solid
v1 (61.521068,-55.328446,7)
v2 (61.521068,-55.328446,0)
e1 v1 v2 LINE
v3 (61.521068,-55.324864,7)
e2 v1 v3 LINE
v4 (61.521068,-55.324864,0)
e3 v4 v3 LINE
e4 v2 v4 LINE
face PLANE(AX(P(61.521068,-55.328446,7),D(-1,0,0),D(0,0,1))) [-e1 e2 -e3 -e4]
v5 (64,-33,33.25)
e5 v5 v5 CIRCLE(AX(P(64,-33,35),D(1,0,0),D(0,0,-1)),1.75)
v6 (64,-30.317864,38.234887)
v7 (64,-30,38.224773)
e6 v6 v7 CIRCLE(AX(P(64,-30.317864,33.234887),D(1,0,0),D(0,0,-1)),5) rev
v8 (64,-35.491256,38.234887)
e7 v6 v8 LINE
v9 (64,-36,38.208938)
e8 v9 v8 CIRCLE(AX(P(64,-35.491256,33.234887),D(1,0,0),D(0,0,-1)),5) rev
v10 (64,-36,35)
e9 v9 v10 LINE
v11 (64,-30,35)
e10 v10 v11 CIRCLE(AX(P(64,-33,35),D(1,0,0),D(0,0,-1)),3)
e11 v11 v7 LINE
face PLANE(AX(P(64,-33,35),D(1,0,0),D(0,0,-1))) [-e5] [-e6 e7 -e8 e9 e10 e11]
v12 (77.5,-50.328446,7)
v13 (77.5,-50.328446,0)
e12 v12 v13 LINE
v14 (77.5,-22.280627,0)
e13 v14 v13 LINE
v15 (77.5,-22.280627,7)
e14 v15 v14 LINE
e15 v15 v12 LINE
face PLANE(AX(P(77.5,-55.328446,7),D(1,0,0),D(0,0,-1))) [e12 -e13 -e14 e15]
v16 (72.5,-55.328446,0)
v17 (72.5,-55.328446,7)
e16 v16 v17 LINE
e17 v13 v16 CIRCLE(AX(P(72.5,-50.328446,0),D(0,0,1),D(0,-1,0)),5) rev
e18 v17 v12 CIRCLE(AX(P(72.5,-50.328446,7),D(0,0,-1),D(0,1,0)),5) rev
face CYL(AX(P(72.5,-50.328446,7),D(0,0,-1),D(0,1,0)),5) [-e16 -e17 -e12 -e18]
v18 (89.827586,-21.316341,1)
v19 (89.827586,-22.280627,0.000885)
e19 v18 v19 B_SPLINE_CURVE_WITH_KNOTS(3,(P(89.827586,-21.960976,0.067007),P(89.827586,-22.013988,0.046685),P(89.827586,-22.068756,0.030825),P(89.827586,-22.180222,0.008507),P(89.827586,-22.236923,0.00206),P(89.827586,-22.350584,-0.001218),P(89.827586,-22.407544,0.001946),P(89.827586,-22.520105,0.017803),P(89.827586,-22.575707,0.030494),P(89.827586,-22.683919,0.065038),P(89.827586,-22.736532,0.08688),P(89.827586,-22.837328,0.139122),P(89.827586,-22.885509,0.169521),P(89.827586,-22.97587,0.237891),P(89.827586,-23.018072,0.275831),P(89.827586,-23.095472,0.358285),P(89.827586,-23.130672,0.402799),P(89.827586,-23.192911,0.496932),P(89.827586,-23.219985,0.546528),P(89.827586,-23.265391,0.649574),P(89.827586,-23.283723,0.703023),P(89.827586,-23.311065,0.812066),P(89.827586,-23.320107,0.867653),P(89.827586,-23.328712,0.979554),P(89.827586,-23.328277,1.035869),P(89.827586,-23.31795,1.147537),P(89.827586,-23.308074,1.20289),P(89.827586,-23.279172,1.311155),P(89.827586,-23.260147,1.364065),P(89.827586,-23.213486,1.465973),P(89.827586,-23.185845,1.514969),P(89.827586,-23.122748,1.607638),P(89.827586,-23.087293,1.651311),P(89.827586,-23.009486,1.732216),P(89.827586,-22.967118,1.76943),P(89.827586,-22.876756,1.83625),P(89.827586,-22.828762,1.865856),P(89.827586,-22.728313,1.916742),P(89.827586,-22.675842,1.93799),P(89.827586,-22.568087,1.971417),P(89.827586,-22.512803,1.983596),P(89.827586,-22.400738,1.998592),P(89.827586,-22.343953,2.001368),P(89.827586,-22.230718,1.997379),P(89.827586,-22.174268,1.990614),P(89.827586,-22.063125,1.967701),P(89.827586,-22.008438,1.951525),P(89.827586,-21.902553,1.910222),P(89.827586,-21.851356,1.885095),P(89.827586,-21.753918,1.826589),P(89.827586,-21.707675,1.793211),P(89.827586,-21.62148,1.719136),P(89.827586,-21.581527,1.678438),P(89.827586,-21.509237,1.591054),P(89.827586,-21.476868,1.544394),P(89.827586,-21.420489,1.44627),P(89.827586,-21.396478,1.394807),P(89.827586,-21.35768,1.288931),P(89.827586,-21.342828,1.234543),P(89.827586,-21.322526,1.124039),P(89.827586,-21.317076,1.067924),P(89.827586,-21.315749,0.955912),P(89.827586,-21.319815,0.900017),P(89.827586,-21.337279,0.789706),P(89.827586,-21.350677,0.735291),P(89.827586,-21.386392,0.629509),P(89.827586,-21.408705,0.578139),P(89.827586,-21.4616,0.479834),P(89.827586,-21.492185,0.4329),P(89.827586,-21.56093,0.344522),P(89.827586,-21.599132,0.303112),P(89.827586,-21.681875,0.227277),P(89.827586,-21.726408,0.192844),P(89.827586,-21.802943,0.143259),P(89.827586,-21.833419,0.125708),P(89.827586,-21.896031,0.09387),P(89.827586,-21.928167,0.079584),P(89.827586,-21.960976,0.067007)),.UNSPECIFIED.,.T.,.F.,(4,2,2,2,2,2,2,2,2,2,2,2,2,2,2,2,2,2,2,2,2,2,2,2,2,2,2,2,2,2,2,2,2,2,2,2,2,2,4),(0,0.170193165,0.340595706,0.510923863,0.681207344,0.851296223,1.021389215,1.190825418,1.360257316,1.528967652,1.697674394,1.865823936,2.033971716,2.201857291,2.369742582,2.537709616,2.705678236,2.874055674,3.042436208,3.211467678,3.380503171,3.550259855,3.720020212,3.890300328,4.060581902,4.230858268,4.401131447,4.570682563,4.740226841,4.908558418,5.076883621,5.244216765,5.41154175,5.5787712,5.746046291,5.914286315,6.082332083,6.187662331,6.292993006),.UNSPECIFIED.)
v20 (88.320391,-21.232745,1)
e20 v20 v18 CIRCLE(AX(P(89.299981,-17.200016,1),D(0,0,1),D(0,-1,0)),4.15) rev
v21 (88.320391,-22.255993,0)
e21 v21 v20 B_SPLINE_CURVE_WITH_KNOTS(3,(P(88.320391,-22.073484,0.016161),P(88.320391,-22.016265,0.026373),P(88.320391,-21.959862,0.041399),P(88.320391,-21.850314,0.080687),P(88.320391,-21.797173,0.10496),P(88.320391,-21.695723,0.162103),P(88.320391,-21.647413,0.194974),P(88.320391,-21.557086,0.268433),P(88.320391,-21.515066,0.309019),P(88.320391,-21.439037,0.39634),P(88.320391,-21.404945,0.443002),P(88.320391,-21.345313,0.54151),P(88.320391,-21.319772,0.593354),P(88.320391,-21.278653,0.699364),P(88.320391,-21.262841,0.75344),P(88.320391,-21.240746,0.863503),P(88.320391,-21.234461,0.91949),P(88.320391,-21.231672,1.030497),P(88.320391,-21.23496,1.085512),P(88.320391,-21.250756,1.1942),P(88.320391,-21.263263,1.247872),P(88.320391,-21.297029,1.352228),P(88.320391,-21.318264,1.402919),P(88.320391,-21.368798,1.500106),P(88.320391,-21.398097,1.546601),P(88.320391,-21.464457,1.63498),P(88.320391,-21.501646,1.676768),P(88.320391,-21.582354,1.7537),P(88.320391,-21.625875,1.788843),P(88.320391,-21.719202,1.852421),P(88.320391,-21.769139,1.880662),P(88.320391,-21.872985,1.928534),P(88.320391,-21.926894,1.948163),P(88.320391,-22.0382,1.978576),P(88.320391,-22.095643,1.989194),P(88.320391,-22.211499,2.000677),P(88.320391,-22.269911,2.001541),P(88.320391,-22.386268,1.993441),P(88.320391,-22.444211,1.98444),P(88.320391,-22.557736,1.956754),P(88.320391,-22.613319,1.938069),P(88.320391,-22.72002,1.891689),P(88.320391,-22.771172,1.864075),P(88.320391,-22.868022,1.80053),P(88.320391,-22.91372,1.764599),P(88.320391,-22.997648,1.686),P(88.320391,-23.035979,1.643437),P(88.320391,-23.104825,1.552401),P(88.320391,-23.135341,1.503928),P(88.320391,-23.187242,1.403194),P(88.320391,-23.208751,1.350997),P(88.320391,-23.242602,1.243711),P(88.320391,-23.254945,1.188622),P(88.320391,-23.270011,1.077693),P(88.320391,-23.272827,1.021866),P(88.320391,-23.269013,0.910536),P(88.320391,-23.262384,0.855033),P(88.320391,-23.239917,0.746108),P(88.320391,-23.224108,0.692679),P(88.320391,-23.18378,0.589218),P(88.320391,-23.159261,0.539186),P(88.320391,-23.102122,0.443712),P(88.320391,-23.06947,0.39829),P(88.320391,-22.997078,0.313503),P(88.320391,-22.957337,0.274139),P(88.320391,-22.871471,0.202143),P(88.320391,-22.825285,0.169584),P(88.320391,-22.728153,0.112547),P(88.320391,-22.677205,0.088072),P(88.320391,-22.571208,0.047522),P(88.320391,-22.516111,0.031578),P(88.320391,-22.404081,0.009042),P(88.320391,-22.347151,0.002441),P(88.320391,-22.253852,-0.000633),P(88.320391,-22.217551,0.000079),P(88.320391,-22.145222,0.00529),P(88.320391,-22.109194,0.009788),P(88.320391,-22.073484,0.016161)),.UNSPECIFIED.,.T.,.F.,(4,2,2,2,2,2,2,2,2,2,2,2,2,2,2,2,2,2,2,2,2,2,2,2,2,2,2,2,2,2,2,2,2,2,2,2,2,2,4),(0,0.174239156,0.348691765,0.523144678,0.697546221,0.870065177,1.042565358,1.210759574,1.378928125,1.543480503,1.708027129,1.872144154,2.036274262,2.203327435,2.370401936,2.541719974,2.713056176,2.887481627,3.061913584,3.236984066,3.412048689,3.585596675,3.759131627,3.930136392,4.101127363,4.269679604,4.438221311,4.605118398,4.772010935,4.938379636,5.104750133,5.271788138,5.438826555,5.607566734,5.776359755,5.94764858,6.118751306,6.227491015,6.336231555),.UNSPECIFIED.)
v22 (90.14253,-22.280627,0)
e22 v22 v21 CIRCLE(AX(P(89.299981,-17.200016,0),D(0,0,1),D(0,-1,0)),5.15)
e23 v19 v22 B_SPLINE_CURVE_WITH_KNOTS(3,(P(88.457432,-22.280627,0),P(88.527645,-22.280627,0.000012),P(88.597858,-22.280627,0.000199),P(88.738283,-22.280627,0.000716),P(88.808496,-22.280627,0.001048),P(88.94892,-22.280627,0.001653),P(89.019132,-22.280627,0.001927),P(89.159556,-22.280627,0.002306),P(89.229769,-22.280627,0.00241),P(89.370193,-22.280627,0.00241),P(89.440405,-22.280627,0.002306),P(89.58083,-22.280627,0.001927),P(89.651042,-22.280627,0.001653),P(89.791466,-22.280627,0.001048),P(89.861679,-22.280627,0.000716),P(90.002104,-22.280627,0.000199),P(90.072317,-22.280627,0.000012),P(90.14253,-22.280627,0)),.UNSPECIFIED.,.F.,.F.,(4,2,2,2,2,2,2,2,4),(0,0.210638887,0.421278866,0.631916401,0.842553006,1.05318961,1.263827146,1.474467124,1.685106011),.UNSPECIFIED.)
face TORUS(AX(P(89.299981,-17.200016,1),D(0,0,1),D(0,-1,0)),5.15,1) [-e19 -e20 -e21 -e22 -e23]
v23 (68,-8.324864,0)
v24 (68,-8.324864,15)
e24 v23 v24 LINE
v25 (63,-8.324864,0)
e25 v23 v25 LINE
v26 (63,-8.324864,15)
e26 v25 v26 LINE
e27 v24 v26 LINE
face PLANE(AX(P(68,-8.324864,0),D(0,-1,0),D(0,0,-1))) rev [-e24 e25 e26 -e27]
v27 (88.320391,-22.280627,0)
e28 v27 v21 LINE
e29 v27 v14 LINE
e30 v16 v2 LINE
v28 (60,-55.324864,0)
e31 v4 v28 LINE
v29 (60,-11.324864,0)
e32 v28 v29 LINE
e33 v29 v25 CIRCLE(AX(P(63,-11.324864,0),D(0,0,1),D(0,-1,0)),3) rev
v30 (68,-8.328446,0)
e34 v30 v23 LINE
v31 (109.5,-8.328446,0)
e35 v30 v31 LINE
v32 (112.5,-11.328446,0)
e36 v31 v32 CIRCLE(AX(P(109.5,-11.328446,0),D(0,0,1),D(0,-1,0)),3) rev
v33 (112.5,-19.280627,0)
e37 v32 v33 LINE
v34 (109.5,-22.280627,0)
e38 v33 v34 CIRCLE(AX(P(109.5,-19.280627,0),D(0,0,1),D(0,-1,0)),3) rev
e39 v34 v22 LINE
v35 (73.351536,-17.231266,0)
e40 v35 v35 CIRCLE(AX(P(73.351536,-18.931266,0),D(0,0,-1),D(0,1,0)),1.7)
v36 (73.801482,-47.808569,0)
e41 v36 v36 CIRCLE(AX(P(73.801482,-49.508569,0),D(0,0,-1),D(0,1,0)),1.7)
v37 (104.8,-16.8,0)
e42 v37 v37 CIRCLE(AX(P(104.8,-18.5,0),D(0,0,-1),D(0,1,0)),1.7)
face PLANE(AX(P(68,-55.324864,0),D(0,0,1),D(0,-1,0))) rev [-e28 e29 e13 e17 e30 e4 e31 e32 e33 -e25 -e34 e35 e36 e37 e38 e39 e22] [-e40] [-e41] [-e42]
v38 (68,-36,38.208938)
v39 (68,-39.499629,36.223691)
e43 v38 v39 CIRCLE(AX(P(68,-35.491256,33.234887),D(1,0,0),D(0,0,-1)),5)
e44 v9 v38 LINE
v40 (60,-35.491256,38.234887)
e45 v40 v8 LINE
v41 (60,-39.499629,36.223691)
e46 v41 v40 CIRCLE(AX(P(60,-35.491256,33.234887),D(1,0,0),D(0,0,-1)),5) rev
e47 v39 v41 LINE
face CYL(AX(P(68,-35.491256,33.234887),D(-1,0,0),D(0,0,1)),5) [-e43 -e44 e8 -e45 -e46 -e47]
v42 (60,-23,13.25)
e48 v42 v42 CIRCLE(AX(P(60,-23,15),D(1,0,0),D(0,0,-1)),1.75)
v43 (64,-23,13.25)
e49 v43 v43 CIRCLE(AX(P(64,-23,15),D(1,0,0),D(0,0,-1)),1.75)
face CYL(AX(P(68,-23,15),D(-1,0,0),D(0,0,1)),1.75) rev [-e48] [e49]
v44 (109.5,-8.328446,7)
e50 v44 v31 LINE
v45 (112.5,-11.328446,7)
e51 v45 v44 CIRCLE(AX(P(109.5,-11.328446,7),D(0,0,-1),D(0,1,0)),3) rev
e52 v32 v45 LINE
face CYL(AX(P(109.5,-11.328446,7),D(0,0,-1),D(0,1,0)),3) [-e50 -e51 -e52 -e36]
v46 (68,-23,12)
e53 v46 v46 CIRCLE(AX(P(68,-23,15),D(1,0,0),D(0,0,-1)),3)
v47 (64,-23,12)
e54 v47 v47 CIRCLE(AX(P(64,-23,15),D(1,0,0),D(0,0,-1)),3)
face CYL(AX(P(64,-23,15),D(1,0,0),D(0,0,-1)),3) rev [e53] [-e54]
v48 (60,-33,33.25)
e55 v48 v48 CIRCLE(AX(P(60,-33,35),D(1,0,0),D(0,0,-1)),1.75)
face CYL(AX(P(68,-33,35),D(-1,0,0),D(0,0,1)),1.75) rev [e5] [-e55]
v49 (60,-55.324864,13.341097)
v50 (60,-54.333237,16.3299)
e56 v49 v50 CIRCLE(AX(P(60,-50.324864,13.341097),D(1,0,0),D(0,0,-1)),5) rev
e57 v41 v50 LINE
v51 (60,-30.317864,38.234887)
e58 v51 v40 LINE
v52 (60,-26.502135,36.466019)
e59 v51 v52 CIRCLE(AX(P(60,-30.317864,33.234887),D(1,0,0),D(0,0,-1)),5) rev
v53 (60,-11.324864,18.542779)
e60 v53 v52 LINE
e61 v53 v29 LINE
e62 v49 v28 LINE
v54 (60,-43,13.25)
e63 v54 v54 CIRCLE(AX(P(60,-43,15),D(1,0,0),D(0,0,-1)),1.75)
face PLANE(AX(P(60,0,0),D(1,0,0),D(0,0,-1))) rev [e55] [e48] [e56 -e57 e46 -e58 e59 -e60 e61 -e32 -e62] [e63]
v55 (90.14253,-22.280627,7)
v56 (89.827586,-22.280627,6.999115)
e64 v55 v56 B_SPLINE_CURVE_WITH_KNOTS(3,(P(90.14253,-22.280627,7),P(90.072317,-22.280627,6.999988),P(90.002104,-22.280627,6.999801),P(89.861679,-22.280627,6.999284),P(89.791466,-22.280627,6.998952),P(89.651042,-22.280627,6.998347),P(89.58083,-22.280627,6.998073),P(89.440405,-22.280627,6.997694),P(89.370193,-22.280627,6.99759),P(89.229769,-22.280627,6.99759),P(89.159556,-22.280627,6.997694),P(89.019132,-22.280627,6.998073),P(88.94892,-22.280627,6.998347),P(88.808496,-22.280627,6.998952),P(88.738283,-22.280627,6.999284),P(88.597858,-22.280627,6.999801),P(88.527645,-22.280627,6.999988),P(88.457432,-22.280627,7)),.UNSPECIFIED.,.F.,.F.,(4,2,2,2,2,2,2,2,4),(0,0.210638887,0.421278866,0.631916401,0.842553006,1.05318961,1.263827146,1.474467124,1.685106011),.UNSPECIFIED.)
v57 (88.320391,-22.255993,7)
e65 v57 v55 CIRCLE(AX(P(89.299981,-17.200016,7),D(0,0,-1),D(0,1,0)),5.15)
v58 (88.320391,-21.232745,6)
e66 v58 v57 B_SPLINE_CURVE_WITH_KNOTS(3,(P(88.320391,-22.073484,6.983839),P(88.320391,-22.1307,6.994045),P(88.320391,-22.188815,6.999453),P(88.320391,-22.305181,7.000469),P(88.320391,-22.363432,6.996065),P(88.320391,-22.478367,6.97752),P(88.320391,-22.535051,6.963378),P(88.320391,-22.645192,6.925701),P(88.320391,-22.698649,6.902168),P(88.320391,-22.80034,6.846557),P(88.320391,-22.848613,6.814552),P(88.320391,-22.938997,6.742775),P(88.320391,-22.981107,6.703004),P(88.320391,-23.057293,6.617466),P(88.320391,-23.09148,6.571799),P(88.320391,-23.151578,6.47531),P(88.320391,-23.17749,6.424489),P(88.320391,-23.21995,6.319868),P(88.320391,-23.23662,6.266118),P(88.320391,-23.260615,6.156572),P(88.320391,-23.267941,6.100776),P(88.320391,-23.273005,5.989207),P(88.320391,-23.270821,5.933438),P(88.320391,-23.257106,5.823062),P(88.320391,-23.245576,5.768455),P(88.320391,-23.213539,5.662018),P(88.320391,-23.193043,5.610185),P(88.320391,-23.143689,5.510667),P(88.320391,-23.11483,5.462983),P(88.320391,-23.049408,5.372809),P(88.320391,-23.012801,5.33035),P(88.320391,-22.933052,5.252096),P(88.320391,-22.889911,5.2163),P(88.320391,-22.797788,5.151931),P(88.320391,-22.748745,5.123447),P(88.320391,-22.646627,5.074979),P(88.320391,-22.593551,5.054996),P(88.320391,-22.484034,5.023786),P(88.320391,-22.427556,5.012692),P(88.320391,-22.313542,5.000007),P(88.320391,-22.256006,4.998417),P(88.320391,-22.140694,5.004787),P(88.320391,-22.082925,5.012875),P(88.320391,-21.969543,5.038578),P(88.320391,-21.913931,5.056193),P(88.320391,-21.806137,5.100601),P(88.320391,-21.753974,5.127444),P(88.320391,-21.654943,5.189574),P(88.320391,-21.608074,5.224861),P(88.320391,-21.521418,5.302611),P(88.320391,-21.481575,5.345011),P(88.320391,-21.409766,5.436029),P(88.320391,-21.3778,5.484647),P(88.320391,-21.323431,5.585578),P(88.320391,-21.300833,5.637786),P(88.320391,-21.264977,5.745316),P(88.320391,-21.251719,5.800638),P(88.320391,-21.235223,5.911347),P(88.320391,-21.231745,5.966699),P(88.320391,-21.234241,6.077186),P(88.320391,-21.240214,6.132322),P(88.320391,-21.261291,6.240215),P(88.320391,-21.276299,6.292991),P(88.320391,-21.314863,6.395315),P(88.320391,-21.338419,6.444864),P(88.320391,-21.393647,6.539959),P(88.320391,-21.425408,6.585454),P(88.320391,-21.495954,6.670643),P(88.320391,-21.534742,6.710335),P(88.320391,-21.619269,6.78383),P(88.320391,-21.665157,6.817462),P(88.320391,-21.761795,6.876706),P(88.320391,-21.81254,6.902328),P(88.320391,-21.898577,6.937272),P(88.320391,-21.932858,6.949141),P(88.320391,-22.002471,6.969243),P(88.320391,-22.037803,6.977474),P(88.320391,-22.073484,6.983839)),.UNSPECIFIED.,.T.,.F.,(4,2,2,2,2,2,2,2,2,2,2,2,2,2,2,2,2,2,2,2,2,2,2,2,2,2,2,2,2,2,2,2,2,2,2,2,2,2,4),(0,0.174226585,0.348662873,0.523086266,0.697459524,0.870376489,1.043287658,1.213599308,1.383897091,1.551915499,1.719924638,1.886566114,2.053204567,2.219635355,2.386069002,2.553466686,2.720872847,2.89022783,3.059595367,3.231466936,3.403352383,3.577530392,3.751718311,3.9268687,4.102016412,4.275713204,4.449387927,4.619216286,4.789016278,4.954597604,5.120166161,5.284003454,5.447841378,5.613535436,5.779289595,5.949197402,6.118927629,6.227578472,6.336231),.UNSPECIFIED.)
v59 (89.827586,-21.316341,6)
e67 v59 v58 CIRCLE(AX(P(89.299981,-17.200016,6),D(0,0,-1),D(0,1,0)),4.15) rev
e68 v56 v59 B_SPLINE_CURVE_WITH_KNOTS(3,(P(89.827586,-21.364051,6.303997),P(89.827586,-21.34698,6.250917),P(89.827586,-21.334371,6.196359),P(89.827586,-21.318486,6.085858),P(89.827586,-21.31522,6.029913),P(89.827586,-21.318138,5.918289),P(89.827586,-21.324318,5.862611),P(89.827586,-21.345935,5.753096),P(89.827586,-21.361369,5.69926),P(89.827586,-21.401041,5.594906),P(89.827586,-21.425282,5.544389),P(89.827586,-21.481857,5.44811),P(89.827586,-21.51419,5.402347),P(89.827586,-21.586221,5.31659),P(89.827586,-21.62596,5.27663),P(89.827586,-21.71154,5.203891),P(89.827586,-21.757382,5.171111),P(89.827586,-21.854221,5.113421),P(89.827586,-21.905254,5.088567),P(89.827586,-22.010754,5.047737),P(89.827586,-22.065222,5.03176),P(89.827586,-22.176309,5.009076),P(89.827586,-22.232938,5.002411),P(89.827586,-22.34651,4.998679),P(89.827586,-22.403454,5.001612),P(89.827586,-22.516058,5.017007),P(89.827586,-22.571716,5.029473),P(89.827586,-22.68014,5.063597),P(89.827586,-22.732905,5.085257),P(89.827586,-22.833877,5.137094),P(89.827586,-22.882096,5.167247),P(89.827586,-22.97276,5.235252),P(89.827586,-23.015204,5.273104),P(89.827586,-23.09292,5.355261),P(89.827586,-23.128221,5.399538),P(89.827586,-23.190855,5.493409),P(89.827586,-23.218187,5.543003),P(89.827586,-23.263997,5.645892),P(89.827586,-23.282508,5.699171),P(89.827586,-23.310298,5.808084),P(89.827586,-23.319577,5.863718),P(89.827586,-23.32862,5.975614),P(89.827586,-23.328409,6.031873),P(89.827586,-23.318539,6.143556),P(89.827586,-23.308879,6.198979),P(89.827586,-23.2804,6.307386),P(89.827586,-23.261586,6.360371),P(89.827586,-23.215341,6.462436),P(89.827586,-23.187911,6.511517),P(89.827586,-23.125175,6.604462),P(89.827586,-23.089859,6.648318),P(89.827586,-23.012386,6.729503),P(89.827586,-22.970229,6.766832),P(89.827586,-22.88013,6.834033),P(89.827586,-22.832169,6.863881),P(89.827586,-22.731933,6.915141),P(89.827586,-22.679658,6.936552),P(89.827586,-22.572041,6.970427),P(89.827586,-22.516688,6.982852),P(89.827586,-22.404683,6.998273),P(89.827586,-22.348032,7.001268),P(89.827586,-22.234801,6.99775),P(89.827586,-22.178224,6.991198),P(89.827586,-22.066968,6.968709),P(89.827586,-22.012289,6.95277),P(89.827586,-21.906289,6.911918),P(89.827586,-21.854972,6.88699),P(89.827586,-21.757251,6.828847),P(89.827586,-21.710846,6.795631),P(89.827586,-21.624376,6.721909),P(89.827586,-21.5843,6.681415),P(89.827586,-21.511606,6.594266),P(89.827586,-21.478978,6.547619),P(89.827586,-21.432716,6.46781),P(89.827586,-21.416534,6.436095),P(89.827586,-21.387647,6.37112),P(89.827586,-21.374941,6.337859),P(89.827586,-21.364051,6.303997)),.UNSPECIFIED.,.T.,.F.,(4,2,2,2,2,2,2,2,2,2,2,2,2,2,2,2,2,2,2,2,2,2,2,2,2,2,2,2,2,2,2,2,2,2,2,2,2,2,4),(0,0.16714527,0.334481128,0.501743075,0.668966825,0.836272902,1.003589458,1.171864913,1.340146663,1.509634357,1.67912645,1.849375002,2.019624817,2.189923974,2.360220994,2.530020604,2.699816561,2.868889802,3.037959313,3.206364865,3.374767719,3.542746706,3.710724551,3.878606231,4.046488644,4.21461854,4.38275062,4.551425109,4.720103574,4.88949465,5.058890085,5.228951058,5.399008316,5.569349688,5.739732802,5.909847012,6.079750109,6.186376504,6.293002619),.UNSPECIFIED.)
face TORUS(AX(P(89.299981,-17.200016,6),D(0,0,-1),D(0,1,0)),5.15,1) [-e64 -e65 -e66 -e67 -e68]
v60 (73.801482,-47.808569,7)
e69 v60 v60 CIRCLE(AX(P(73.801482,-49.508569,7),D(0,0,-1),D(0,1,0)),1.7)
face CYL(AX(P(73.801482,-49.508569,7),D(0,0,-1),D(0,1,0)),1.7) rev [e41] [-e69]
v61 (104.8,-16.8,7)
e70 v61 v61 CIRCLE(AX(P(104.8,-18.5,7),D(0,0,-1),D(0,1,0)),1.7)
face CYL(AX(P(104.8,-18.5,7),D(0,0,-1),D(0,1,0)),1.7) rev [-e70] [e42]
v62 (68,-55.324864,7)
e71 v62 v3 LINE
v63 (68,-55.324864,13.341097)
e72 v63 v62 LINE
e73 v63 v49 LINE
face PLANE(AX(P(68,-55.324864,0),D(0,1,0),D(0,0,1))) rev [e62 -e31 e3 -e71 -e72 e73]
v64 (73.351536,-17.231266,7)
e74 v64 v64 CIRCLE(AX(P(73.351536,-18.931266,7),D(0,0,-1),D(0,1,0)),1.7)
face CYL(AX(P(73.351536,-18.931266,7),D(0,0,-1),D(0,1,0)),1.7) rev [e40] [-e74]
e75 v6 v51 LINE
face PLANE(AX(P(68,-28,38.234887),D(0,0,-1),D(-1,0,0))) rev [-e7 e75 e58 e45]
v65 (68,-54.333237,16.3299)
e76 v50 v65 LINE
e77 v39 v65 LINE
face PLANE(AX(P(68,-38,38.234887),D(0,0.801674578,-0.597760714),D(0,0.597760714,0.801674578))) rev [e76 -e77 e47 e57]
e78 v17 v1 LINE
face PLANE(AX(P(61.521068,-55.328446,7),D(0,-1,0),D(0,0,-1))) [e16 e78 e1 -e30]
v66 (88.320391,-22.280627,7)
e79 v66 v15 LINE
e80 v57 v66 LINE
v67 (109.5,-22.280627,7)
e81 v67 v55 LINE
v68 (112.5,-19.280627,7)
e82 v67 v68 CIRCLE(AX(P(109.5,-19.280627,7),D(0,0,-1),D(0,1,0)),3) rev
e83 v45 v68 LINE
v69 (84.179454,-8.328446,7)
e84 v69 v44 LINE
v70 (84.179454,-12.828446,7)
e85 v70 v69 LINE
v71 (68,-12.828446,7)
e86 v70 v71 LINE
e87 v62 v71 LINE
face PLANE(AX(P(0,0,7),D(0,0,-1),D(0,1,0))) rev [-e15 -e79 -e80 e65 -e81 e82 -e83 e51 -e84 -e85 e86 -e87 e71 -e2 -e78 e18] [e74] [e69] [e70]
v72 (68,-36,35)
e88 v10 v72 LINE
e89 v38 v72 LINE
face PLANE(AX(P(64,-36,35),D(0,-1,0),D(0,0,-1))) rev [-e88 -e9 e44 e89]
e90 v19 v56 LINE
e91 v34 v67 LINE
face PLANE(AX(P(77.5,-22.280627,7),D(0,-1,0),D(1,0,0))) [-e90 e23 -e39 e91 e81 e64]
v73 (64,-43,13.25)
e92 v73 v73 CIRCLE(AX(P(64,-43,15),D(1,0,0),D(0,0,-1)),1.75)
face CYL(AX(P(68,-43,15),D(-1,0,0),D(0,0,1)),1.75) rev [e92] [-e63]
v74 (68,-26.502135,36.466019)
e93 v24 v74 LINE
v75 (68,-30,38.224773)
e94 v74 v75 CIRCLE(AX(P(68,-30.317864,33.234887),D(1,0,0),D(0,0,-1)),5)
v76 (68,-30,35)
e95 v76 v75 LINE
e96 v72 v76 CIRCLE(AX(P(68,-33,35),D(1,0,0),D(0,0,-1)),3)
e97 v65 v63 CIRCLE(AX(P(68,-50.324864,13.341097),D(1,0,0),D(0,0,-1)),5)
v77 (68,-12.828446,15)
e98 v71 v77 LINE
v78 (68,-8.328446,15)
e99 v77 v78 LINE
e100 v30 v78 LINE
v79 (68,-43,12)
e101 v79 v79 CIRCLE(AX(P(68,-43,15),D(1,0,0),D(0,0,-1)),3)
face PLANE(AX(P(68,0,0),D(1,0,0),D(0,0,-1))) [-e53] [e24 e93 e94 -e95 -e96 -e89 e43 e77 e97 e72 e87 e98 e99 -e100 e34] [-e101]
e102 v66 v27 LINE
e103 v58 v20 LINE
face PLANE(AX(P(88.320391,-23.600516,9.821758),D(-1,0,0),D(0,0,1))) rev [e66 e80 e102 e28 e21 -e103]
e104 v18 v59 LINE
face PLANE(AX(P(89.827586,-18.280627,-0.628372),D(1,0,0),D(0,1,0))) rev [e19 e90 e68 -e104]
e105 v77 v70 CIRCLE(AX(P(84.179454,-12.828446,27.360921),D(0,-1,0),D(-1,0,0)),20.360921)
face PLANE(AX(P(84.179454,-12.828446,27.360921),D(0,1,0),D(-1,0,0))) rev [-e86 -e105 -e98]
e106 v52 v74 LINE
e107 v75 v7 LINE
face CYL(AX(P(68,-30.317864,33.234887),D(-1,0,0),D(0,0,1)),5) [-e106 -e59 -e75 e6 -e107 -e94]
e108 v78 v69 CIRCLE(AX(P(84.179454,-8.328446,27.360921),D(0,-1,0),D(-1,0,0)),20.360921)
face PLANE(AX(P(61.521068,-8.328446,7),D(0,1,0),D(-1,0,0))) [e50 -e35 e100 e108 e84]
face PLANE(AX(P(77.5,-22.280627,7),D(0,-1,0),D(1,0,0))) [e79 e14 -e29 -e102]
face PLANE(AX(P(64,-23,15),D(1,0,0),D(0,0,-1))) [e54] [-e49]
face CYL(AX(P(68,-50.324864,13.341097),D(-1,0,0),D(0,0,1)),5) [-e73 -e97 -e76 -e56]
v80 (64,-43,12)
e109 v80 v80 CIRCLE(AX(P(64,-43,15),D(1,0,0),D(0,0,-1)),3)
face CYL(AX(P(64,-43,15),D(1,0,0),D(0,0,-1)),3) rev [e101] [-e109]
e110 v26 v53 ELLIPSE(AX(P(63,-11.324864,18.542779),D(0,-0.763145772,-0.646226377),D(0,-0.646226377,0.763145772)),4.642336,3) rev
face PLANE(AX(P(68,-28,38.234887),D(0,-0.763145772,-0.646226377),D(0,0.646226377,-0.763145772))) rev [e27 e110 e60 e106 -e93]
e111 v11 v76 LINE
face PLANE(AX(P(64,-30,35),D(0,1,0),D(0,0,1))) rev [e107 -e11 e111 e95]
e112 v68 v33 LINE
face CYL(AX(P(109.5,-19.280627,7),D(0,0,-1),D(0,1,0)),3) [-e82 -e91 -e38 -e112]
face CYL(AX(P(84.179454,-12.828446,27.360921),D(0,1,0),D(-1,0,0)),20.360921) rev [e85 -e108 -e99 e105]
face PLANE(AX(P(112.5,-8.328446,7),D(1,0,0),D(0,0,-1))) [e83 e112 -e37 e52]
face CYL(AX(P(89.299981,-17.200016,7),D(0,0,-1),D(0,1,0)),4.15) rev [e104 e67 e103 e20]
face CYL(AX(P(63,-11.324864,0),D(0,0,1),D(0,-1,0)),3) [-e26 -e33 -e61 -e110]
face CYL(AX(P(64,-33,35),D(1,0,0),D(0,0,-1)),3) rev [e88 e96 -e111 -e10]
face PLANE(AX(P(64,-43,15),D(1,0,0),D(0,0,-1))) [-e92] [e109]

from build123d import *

# Parameters (mm, degrees)
SKETCH50_R         = 1.75
EXTRUDE1_DEPTH     = 8
SKETCH52_R         = 4.15
SKETCH52_R_2       = 1.7
EXTRUDE2_DEPTH     = 7
FILLET1_R          = 3
FILLET2_R          = 5
EXTRUDE3_DEPTH     = 4.5
FILLET4_R          = 5
FILLET5_R          = 3
SKETCH55_R         = 3
CUT_EXTRUDE3_DEPTH = 4
FILLET9_R          = 1
FILLET10_R         = 1
SKETCH57_W         = 1
SKETCH57_H         = 8.155835086
EXTRUDE4_DEPTH     = 4
CUT_EXTRUDE4_START = -7
SKETCH56_W         = 0.996940693
SKETCH56_H         = 2.63977817
CUT_EXTRUDE4_DEPTH = 7.000001


with BuildPart() as part:
    # Sketch50 → Extrude1 (new body)
    with BuildSketch(Plane(origin=(60, 0, 0), x_dir=(0, 0, -1), z_dir=(1, 0, 0))):
        Polygon((-38.234887292, -28), (-38.234887292, -38), (-15, -55.32486375), (0, -55.32486375), (0, -8.32486375), (-15, -8.32486375), align=None)
        with Locations((-35, -33)):
            Circle(SKETCH50_R, mode=Mode.SUBTRACT)
        with Locations((-15, -23)):
            Circle(SKETCH50_R, mode=Mode.SUBTRACT)
        with Locations((-15, -43)):
            Circle(SKETCH50_R, mode=Mode.SUBTRACT)
    extrude(amount=EXTRUDE1_DEPTH)

    # Sketch52 → Extrude2 (add)
    with BuildSketch(Plane(origin=(0, 0, 0), x_dir=(-1, 0, 0), z_dir=(0, 0, -1))):
        Polygon((-61.521067729, -55.328445544), (-61.521067729, -8.328445544), (-112.5, -8.328445544), (-112.5, -22.280627193), (-77.5, -22.280627193), (-77.5, -55.328445544), align=None)
        with Locations(Location((-89.299980942, -17.200015896, 0), (0, 0, 90))):
            Circle(SKETCH52_R, mode=Mode.SUBTRACT)
        with Locations(Location((-73.351535893, -18.931266408, 0), (0, 0, 90))):
            Circle(SKETCH52_R_2, mode=Mode.SUBTRACT)
        with Locations(Location((-104.8, -18.5, 0), (0, 0, 90))):
            Circle(SKETCH52_R_2, mode=Mode.SUBTRACT)
        with Locations(Location((-73.801481725, -49.508569042, 0), (0, 0, 90))):
            Circle(SKETCH52_R_2, mode=Mode.SUBTRACT)
    extrude(amount=-EXTRUDE2_DEPTH)

    # Fillet1
    fillet1_edges = [part.edges().sort_by_distance(p)[0] for p in [
        (112.5, -22.280627193, 3.5),
        (112.5, -8.328445544, 3.5),
    ]]
    fillet(fillet1_edges, radius=FILLET1_R)

    # Fillet2
    fillet2_edges = [part.edges().sort_by_distance(p)[0] for p in [
        (77.5, -55.328445544, 3.5),
    ]]
    fillet(fillet2_edges, radius=FILLET2_R)

    # Sketch54 → Extrude3 (add)
    with BuildSketch(Plane(origin=(0, -8.328445544, 0), x_dir=(1, 0, 0), z_dir=(0, 1, 0))):
        with BuildLine():
            Line((68, -15), (68, -7))
            Line((68, -7), (84.179453899, -7))
            ThreePointArc((84.179453899, -7), (75.154838555, -9.109252039), (68, -15))
        make_face()
    extrude(amount=-EXTRUDE3_DEPTH)

    # Fillet4
    fillet4_edges = [part.edges().sort_by_distance(p)[0] for p in [
        (64, -55.32486375, 15),
        (64, -38, 38.234887292),
        (64, -28, 38.234887292),
    ]]
    fillet(fillet4_edges, radius=FILLET4_R)

    # Fillet5
    fillet5_edges = [part.edges().sort_by_distance(p)[0] for p in [
        (60, -8.32486375, 7.5),
    ]]
    fillet(fillet5_edges, radius=FILLET5_R)

    # Sketch55 → Cut-Extrude3 (cut)
    with BuildSketch(Plane(origin=(68, 0, 0), x_dir=(0, 0, -1), z_dir=(1, 0, 0))):
        with Locations((-15, -23)):
            Circle(SKETCH55_R)
        with Locations((-15, -43)):
            Circle(SKETCH55_R)
        with BuildLine():
            Line((-35, -30), (-38.787900912, -30))
            Line((-38.787900912, -30), (-38.787900912, -36))
            Line((-38.787900912, -36), (-35, -36))
            ThreePointArc((-35, -36), (-32, -33), (-35, -30))
        make_face()
    extrude(amount=-CUT_EXTRUDE3_DEPTH, mode=Mode.SUBTRACT)

    # Fillet9
    # the kernel refuses this fillet: 1 mm, written as the material it takes off along each edge
    with BuildSketch(Plane(origin=(89.299980942, -17.200015896, 0), x_dir=(0, 1, 0), z_dir=(-1, 0, 0))) as fillet9_piece_1:
        with BuildLine():
            CenterArc((4.15 + FILLET9_R, -FILLET9_R), FILLET9_R, 90, 90)
            Line((4.15, -FILLET9_R), (4.15, 0))
            Line((4.15, 0), (4.15 + FILLET9_R, 0))
        make_face()
    revolve(axis=Axis((89.299980942, -17.200015896, 0), (0, 0, -1)), mode=Mode.SUBTRACT)

    # Fillet10
    # the kernel refuses this fillet: 1 mm, written as the material it takes off along each edge
    with BuildSketch(Plane(origin=(89.299980942, -17.200015896, 7), x_dir=(0, 1, 0), z_dir=(-1, 0, 0))) as fillet10_piece_1:
        with BuildLine():
            CenterArc((4.15 + FILLET10_R, FILLET10_R), FILLET10_R, 180, 90)
            Line((4.15, FILLET10_R), (4.15, 0))
            Line((4.15, 0), (4.15 + FILLET10_R, 0))
        make_face()
    revolve(axis=Axis((89.299980942, -17.200015896, 7), (0, 0, -1)), mode=Mode.SUBTRACT)

    # Sketch57 → Extrude4 (cut)
    with BuildSketch(Plane.XZ.offset(22.280627193)):
        with Locations((89.327585964, 3.449545077)):
            Rectangle(SKETCH57_W, SKETCH57_H)
    extrude(amount=-EXTRUDE4_DEPTH, mode=Mode.SUBTRACT)

    # Sketch56 → Cut-Extrude4 (cut)
    with BuildSketch(Plane(origin=(0, 0, 0), x_dir=(-1, 0, 0), z_dir=(0, 0, -1)).offset(CUT_EXTRUDE4_START)):
        with Locations((-88.818861809, -22.280627193)):
            Rectangle(SKETCH56_W, SKETCH56_H)
    extrude(amount=CUT_EXTRUDE4_DEPTH, mode=Mode.SUBTRACT)


solid = part.part
